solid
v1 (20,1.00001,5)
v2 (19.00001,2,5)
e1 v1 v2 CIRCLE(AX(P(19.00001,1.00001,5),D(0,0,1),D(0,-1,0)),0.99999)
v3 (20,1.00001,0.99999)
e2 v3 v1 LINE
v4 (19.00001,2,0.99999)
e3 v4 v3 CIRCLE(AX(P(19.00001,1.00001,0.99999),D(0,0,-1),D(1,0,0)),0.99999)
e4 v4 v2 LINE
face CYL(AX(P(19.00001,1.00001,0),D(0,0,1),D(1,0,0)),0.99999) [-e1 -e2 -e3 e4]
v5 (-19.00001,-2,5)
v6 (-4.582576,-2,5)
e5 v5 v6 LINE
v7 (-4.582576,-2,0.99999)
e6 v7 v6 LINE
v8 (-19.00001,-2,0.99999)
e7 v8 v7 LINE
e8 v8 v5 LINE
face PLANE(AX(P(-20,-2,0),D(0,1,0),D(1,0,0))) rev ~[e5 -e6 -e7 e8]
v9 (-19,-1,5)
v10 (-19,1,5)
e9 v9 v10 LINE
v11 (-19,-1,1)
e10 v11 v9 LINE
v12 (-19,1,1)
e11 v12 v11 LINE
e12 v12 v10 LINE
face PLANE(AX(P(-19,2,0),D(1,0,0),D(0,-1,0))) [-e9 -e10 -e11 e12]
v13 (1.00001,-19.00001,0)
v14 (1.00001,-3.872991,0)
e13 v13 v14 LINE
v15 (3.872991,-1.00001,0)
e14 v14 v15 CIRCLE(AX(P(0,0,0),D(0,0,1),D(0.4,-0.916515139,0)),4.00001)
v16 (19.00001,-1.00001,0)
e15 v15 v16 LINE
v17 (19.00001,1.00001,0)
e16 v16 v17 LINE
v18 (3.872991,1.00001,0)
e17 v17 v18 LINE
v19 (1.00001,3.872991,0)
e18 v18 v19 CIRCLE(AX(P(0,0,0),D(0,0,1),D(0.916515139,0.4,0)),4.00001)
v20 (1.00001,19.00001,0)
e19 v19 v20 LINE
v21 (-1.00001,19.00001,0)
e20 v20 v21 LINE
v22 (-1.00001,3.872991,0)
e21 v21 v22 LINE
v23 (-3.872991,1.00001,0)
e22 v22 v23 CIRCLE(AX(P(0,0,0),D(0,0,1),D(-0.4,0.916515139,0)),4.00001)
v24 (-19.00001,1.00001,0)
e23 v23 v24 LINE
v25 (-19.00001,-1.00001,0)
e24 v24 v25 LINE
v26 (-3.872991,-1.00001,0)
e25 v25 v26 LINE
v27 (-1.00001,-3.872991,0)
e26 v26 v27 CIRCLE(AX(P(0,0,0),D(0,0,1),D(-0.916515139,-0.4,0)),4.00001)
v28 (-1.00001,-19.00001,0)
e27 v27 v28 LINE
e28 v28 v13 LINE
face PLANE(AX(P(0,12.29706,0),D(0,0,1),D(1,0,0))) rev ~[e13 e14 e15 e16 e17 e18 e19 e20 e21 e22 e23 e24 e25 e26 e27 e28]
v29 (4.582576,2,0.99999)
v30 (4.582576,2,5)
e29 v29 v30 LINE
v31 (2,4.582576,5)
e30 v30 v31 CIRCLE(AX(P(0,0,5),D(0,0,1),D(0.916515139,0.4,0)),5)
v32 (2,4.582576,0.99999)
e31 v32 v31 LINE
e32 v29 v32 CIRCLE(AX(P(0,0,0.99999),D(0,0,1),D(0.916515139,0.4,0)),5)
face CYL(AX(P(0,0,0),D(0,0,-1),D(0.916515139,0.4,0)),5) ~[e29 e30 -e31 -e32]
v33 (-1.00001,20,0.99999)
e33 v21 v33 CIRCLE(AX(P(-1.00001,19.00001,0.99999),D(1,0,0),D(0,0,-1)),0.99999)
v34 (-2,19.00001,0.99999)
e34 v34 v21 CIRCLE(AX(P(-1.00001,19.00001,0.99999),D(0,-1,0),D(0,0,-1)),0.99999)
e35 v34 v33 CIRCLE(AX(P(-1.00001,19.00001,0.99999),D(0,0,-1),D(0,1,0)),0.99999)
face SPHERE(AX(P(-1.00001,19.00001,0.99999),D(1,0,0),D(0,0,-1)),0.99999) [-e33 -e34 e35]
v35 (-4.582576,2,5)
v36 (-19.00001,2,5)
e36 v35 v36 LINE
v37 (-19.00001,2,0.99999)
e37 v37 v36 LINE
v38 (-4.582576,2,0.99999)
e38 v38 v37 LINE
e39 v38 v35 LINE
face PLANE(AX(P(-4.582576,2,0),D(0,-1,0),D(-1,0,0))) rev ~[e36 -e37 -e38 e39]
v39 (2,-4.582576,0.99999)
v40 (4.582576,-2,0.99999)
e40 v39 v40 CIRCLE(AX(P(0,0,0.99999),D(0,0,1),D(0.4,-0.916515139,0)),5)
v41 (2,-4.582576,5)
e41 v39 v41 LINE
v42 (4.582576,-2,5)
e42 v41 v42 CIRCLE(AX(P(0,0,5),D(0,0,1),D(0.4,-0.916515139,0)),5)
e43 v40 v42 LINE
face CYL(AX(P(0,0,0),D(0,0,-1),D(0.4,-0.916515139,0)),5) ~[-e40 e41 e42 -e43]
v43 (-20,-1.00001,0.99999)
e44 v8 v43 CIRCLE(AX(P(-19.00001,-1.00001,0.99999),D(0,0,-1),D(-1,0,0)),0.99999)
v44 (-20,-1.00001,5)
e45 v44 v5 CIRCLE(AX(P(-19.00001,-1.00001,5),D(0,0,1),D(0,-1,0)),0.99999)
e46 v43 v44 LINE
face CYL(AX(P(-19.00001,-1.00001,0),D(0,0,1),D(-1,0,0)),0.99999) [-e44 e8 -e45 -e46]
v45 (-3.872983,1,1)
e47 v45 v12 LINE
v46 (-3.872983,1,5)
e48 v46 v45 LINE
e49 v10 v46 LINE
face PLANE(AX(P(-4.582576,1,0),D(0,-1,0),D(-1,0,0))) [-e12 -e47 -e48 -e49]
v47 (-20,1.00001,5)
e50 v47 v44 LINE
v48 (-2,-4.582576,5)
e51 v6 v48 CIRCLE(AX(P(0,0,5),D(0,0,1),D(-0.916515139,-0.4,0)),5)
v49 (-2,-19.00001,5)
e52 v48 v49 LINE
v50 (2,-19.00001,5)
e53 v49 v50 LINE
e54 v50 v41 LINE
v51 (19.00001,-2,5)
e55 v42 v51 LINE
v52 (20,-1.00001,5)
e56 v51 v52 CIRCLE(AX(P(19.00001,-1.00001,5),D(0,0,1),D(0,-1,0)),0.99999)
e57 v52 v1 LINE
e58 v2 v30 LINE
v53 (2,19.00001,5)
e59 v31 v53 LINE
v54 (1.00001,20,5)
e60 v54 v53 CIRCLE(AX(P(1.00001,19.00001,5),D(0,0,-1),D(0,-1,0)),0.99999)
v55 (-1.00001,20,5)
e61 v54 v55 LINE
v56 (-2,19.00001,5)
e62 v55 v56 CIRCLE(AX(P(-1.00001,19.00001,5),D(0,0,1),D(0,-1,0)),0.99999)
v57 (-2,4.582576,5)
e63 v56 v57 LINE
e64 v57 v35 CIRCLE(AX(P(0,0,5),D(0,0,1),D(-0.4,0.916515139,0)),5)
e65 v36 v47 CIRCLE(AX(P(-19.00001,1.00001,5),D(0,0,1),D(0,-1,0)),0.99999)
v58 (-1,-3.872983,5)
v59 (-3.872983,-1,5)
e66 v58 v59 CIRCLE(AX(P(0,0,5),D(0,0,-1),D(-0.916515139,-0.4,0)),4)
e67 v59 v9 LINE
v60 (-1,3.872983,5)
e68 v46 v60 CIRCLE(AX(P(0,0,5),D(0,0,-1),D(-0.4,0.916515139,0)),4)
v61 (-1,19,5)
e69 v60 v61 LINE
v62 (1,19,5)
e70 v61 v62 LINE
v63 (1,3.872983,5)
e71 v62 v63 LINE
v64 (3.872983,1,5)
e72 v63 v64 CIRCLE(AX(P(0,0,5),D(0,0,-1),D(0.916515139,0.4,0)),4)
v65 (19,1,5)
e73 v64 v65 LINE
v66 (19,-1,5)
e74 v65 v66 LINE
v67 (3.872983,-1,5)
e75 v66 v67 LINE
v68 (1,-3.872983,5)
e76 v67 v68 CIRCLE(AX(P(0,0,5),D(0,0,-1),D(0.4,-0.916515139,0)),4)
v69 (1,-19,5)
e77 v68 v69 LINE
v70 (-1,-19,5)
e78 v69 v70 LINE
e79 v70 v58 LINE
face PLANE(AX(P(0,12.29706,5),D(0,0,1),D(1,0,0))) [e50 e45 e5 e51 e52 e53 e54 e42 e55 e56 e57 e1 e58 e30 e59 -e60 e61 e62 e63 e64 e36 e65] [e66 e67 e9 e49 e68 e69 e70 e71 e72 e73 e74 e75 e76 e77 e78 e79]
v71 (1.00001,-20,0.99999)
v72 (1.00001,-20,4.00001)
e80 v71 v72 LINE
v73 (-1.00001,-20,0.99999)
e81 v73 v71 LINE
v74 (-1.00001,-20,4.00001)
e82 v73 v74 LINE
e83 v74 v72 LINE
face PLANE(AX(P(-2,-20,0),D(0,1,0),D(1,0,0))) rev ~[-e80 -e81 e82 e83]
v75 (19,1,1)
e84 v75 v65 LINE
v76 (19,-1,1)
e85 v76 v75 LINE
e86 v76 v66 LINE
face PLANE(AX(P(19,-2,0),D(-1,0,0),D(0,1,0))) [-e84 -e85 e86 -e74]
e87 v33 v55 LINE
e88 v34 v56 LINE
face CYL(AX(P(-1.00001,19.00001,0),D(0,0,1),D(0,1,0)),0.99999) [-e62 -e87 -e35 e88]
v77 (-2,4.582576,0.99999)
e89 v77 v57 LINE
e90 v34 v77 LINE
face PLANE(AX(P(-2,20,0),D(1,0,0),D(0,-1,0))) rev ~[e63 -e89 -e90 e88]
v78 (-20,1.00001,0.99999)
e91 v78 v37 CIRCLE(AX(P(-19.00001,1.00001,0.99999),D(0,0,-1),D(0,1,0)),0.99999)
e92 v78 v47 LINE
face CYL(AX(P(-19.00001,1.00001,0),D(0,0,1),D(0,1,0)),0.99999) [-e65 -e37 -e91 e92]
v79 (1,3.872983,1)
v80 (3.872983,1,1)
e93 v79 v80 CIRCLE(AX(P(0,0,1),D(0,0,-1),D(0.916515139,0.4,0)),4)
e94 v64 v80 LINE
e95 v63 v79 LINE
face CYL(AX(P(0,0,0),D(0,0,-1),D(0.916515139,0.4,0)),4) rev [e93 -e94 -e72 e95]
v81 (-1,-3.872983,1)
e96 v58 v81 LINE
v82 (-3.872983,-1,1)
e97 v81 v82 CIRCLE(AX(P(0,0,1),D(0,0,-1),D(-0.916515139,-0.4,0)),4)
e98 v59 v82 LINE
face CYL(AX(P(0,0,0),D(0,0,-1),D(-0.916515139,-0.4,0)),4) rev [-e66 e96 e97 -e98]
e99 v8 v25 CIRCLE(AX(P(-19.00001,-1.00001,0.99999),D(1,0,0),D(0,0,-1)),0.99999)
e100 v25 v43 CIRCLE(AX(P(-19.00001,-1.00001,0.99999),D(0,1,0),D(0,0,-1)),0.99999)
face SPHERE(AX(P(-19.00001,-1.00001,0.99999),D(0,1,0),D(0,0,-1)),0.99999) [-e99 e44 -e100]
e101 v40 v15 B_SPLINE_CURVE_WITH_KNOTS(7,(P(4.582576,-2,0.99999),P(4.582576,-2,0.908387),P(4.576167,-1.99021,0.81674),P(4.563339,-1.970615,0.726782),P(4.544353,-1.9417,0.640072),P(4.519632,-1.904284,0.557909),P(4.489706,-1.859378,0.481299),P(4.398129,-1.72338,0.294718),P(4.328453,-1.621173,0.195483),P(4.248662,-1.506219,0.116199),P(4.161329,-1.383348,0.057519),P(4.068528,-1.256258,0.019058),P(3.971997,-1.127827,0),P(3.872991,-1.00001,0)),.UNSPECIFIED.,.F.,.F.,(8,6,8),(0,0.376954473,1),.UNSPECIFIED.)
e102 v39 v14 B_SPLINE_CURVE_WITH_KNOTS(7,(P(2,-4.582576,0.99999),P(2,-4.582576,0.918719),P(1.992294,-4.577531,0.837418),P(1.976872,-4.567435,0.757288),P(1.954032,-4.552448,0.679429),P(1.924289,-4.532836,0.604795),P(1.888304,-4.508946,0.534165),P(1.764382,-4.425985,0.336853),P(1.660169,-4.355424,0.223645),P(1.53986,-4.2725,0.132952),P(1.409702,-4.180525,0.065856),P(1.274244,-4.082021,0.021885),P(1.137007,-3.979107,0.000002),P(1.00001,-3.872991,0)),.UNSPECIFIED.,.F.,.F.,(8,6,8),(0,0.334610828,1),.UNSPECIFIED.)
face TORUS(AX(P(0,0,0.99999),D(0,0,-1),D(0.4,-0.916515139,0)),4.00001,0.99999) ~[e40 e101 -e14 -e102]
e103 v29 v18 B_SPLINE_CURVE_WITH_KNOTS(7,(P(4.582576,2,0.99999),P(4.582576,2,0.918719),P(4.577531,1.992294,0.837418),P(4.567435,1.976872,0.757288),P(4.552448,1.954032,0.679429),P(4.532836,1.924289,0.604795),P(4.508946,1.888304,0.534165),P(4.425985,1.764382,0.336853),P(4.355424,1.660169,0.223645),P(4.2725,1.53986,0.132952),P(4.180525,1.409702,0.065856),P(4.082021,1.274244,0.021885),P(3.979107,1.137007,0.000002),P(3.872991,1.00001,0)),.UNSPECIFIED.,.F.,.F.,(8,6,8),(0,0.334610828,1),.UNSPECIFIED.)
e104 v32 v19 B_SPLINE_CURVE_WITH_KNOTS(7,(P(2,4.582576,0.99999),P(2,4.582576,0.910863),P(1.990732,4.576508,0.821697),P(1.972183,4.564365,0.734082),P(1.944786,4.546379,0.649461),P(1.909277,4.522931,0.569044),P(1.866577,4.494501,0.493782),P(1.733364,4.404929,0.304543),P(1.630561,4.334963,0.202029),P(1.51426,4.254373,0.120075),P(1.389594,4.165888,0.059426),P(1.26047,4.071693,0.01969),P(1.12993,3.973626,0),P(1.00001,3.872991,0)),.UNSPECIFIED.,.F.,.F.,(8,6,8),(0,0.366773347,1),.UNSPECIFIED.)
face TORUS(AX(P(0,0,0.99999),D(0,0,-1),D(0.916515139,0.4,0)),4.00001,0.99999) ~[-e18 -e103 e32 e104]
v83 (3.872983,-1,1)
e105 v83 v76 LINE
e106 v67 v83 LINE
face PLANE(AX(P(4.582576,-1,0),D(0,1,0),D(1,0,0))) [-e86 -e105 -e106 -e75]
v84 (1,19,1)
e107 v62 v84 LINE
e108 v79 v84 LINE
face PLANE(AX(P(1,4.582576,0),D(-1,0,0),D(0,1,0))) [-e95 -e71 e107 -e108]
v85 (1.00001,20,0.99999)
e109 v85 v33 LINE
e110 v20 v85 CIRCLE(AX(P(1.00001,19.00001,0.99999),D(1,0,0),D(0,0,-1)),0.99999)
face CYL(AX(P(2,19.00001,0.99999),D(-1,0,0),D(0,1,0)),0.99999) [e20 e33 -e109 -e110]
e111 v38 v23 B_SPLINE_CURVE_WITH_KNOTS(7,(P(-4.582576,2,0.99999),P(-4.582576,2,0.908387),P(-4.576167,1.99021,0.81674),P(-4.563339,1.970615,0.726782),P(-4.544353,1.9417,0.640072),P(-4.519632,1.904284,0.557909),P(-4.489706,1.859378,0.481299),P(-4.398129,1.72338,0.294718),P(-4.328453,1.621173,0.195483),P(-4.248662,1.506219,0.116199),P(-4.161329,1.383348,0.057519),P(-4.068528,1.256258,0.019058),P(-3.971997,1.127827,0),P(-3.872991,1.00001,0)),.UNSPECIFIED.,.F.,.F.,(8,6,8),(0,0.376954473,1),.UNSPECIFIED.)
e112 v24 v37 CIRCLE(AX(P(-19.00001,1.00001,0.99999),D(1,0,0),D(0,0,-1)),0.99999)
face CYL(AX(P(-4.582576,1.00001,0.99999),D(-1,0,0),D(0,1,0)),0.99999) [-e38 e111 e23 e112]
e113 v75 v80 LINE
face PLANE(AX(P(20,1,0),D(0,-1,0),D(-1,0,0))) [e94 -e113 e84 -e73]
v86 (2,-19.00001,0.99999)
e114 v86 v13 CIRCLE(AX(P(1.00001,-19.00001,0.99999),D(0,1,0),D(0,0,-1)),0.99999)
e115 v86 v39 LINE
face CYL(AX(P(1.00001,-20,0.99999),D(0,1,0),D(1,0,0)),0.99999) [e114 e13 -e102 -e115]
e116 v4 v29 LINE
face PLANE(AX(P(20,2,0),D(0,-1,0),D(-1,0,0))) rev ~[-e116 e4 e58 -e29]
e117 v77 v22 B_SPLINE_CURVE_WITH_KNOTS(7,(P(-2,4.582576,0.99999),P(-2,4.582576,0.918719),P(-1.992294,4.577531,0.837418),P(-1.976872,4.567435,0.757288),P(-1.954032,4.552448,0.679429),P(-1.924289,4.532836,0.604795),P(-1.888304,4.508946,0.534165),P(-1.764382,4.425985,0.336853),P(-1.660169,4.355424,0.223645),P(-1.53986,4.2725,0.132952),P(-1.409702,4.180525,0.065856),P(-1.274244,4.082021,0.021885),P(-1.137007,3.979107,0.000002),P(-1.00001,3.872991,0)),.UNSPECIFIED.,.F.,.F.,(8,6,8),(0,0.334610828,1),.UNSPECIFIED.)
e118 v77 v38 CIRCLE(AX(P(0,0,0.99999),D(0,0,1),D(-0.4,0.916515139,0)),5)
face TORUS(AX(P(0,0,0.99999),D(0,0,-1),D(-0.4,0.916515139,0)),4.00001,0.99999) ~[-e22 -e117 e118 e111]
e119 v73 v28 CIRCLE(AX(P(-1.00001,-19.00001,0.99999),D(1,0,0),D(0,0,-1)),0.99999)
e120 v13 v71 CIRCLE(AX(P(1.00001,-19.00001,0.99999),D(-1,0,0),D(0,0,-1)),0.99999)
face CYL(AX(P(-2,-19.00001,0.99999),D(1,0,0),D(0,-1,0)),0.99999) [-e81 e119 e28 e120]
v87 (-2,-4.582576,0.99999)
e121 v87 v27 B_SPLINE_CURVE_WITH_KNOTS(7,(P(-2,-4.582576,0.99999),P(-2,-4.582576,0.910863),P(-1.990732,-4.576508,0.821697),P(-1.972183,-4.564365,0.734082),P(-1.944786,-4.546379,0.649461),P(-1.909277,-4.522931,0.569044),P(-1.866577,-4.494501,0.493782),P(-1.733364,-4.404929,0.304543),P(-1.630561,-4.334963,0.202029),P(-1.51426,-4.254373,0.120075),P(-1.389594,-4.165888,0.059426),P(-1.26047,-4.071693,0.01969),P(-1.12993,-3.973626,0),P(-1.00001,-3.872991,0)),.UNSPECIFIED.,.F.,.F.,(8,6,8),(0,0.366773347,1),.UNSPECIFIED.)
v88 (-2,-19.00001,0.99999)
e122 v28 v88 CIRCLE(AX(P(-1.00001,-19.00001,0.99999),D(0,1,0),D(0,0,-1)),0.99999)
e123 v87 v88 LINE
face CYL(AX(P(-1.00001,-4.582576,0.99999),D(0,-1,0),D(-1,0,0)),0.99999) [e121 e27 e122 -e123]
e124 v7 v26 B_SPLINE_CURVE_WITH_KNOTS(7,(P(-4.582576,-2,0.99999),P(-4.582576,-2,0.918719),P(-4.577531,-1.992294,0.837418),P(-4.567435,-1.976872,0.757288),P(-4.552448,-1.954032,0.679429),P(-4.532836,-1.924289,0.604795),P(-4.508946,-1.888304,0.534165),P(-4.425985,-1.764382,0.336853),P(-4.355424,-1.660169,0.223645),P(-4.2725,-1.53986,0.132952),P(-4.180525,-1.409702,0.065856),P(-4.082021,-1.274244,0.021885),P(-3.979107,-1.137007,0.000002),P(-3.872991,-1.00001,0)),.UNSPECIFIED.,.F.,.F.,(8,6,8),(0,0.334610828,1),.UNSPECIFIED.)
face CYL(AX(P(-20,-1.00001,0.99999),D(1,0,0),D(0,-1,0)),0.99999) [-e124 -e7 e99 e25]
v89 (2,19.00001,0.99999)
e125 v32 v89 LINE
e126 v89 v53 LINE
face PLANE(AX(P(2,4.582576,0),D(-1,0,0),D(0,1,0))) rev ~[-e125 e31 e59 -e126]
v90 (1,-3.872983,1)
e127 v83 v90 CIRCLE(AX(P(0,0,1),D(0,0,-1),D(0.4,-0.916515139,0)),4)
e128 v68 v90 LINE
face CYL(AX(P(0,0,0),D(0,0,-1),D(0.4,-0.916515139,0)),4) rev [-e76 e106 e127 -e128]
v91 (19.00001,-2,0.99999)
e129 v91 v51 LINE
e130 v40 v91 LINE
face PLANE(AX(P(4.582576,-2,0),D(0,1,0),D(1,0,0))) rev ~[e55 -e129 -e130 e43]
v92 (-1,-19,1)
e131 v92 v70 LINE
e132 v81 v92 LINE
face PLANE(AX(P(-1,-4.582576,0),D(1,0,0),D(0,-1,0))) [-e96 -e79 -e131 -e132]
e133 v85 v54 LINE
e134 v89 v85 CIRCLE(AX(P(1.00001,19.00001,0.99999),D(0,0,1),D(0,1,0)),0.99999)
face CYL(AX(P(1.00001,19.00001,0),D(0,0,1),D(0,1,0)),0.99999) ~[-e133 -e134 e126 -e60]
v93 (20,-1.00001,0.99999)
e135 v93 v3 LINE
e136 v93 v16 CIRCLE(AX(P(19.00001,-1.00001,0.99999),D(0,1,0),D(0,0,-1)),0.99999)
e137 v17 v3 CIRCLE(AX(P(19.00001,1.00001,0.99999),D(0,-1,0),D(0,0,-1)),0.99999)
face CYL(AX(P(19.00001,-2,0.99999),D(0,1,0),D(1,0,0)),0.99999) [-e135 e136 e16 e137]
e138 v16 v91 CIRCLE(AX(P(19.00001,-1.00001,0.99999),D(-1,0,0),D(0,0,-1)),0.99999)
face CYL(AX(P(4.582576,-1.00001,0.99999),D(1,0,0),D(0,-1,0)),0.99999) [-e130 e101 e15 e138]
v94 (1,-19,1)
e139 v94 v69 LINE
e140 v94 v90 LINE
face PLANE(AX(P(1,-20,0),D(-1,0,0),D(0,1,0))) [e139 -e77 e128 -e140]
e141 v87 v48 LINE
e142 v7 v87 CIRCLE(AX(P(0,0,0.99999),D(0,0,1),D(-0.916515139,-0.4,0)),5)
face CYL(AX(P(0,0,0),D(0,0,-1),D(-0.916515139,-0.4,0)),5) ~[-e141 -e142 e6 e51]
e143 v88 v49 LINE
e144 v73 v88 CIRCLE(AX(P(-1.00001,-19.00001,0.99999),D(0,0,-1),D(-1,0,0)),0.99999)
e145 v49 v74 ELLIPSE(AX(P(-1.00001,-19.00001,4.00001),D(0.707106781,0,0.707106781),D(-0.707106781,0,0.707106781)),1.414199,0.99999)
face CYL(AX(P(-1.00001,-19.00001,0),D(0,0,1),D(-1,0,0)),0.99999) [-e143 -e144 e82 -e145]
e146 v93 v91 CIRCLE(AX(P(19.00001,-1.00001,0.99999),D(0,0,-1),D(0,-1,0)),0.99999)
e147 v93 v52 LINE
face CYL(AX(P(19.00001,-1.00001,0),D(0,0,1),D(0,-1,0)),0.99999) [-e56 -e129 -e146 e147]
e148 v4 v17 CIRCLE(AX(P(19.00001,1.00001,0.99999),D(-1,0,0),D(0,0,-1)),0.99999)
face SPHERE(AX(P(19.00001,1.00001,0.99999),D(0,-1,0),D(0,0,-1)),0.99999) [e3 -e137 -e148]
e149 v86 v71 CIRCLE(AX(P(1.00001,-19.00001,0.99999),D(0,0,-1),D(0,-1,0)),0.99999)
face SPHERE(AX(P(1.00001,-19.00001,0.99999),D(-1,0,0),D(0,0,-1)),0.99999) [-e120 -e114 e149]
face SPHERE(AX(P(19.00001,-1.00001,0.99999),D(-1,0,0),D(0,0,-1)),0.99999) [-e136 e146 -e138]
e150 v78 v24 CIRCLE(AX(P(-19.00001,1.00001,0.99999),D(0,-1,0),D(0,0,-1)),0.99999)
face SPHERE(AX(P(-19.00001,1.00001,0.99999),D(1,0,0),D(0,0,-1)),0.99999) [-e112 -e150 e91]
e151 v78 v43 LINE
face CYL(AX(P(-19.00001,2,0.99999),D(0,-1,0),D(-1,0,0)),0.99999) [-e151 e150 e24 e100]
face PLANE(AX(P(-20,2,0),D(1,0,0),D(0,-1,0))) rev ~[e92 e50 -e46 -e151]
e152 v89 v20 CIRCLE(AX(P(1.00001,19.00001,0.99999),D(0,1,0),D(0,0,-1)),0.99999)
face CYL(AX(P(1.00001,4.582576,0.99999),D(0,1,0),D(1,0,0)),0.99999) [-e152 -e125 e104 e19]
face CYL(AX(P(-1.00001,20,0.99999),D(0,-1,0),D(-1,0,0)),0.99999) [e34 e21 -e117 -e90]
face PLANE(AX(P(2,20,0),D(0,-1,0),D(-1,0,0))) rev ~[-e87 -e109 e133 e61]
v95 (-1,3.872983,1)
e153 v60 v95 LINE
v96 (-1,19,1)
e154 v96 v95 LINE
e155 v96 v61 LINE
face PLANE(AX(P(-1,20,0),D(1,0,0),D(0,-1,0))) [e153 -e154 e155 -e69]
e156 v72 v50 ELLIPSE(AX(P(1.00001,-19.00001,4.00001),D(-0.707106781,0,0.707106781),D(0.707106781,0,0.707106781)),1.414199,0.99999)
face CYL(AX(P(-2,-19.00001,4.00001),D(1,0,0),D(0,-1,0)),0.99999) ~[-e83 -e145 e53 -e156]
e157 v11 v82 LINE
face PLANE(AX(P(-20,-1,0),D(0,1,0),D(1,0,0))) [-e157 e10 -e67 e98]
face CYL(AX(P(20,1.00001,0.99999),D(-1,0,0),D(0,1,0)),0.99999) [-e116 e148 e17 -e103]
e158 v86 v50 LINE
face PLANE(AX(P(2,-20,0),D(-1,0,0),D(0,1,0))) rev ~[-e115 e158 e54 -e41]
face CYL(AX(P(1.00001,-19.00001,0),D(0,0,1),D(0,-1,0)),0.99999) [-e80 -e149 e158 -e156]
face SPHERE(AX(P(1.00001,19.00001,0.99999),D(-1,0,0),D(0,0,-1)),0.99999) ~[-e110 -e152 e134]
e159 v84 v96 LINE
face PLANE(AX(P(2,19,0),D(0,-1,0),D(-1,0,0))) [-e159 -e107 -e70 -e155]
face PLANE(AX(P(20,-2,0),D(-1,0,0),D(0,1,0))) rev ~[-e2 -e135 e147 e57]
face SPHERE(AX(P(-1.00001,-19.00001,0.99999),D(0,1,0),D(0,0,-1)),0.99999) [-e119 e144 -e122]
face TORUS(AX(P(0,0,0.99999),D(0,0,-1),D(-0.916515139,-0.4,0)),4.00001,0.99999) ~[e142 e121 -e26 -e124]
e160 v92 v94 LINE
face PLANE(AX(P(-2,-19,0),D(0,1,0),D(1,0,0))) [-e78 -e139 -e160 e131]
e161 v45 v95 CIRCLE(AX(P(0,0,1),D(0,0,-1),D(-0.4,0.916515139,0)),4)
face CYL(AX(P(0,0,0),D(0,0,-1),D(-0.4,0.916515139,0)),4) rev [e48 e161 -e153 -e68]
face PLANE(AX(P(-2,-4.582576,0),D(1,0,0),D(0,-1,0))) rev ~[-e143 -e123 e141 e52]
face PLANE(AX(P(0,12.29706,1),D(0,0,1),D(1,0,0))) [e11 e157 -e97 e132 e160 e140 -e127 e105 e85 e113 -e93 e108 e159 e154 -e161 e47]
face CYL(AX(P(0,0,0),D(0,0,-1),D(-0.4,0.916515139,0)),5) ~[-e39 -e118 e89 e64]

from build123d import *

# Parameters (mm, degrees)
F0_W     = 4
F0_H     = 4
F1_DEPTH = 5
F2_T     = -1
F3_R     = 0.99999


# Not quite as in the source:
# - a fillet or chamfer is up to 0.001 mm smaller than in the source, because OpenCascade refuses the exact size


with BuildPart() as f1:
    # F0 (on Top) → F1 (new body)
    with BuildSketch(Plane.XY):
        with BuildLine():
            ThreePointArc((-2, 4.582575695), (0, 5), (2, 4.582575695))
            Line((2, 4.582575695), (2, 20))
            Line((2, 20), (-2, 20))
            Line((-2, 20), (-2, 4.582575695))
        make_face()
        with BuildLine():
            Line((2, 2), (2, 4.582575695))
            ThreePointArc((2, 4.582575695), (0, 5), (-2, 4.582575695))
            Line((-2, 4.582575695), (-2, 2))
            Line((-2, 2), (2, 2))
        make_face()
        Rectangle(F0_W, F0_H)
        with BuildLine():
            ThreePointArc((-2, -4.582575695), (0, -5), (2, -4.582575695))
            Line((2, -4.582575695), (2, -2))
            Line((2, -2), (-2, -2))
            Line((-2, -2), (-2, -4.582575695))
        make_face()
        with BuildLine():
            Line((2, -20), (2, -4.582575695))
            ThreePointArc((2, -4.582575695), (0, -5), (-2, -4.582575695))
            Line((-2, -4.582575695), (-2, -20))
            Line((-2, -20), (2, -20))
        make_face()
        with BuildLine():
            ThreePointArc((4.582575695, 2), (4.8945315647, 1.0215482184), (5, 0))
            ThreePointArc((5, 0), (4.8945315647, -1.0215482184), (4.582575695, -2))
            Line((4.582575695, -2), (20, -2))
            Line((20, -2), (20, 2))
            Line((20, 2), (4.582575695, 2))
        make_face()
        with BuildLine():
            Line((2, 2), (4.582575695, 2))
            ThreePointArc((4.582575695, 2), (3.5355339059, 3.5355339059), (2, 4.582575695))
            Line((2, 4.582575695), (2, 2))
        make_face()
        with BuildLine():
            ThreePointArc((4.582575695, -2), (4.8945315647, -1.0215482184), (5, 0))
            ThreePointArc((5, 0), (4.8945315647, 1.0215482184), (4.582575695, 2))
            Line((4.582575695, 2), (2, 2))
            Line((2, 2), (2, -2))
            Line((2, -2), (4.582575695, -2))
        make_face()
        with BuildLine():
            ThreePointArc((2, -4.582575695), (3.5355339059, -3.5355339059), (4.582575695, -2))
            Line((4.582575695, -2), (2, -2))
            Line((2, -2), (2, -4.582575695))
        make_face()
        with BuildLine():
            Line((-2, -2), (-2, 2))
            Line((-2, 2), (-4.582575695, 2))
            ThreePointArc((-4.582575695, 2), (-5, 0), (-4.582575695, -2))
            Line((-4.582575695, -2), (-2, -2))
        make_face()
        with BuildLine():
            Line((-2, 2), (-2, 4.582575695))
            ThreePointArc((-2, 4.582575695), (-3.5355339059, 3.5355339059), (-4.582575695, 2))
            Line((-4.582575695, 2), (-2, 2))
        make_face()
        with BuildLine():
            ThreePointArc((-4.582575695, -2), (-3.5355339059, -3.5355339059), (-2, -4.582575695))
            Line((-2, -4.582575695), (-2, -2))
            Line((-2, -2), (-4.582575695, -2))
        make_face()
        with BuildLine():
            ThreePointArc((-4.582575695, -2), (-5, 0), (-4.582575695, 2))
            Line((-4.582575695, 2), (-20, 2))
            Line((-20, 2), (-20, -2))
            Line((-20, -2), (-4.582575695, -2))
        make_face()
    extrude(amount=F1_DEPTH)

    # F2
    f2_openings = [f1.faces().sort_by_distance(p)[0] for p in [
        (0, 0, 5),
    ]]
    offset(amount=F2_T, openings=f2_openings, kind=Kind.INTERSECTION)

    # F3 (radius 1 in the source; OpenCascade refuses exactly that, so slightly less here)
    f3_edges = [f1.edges().sort_by_distance(p)[0] for p in [
        (0, 20, 0),
        (-2, 12.291288, 0),
        (-3.535534, 3.535534, 0),
        (-12.291288, 2, 0),
        (-20, 0, 0),
        (-12.291288, -2, 0),
        (-3.535534, -3.535534, 0),
        (-2, -12.291288, 0),
        (0, -20, 0),
        (2, -12.291288, 0),
        (3.535534, -3.535534, 0),
        (12.291288, -2, 0),
        (20, 0, 0),
        (12.291288, 2, 0),
        (3.535534, 3.535534, 0),
        (2, 12.291288, 0),
        (2, -20, 2.5),
        (-2, -20, 2.5),
        (0, -20, 5),
        (-20, 2, 2.5),
        (-20, -2, 2.5),
        (-2, 20, 2.5),
        (2, 20, 2.5),
        (20, 2, 2.5),
        (20, -2, 2.5),
    ]]
    fillet(f3_edges, radius=F3_R)


solid = f1.part
